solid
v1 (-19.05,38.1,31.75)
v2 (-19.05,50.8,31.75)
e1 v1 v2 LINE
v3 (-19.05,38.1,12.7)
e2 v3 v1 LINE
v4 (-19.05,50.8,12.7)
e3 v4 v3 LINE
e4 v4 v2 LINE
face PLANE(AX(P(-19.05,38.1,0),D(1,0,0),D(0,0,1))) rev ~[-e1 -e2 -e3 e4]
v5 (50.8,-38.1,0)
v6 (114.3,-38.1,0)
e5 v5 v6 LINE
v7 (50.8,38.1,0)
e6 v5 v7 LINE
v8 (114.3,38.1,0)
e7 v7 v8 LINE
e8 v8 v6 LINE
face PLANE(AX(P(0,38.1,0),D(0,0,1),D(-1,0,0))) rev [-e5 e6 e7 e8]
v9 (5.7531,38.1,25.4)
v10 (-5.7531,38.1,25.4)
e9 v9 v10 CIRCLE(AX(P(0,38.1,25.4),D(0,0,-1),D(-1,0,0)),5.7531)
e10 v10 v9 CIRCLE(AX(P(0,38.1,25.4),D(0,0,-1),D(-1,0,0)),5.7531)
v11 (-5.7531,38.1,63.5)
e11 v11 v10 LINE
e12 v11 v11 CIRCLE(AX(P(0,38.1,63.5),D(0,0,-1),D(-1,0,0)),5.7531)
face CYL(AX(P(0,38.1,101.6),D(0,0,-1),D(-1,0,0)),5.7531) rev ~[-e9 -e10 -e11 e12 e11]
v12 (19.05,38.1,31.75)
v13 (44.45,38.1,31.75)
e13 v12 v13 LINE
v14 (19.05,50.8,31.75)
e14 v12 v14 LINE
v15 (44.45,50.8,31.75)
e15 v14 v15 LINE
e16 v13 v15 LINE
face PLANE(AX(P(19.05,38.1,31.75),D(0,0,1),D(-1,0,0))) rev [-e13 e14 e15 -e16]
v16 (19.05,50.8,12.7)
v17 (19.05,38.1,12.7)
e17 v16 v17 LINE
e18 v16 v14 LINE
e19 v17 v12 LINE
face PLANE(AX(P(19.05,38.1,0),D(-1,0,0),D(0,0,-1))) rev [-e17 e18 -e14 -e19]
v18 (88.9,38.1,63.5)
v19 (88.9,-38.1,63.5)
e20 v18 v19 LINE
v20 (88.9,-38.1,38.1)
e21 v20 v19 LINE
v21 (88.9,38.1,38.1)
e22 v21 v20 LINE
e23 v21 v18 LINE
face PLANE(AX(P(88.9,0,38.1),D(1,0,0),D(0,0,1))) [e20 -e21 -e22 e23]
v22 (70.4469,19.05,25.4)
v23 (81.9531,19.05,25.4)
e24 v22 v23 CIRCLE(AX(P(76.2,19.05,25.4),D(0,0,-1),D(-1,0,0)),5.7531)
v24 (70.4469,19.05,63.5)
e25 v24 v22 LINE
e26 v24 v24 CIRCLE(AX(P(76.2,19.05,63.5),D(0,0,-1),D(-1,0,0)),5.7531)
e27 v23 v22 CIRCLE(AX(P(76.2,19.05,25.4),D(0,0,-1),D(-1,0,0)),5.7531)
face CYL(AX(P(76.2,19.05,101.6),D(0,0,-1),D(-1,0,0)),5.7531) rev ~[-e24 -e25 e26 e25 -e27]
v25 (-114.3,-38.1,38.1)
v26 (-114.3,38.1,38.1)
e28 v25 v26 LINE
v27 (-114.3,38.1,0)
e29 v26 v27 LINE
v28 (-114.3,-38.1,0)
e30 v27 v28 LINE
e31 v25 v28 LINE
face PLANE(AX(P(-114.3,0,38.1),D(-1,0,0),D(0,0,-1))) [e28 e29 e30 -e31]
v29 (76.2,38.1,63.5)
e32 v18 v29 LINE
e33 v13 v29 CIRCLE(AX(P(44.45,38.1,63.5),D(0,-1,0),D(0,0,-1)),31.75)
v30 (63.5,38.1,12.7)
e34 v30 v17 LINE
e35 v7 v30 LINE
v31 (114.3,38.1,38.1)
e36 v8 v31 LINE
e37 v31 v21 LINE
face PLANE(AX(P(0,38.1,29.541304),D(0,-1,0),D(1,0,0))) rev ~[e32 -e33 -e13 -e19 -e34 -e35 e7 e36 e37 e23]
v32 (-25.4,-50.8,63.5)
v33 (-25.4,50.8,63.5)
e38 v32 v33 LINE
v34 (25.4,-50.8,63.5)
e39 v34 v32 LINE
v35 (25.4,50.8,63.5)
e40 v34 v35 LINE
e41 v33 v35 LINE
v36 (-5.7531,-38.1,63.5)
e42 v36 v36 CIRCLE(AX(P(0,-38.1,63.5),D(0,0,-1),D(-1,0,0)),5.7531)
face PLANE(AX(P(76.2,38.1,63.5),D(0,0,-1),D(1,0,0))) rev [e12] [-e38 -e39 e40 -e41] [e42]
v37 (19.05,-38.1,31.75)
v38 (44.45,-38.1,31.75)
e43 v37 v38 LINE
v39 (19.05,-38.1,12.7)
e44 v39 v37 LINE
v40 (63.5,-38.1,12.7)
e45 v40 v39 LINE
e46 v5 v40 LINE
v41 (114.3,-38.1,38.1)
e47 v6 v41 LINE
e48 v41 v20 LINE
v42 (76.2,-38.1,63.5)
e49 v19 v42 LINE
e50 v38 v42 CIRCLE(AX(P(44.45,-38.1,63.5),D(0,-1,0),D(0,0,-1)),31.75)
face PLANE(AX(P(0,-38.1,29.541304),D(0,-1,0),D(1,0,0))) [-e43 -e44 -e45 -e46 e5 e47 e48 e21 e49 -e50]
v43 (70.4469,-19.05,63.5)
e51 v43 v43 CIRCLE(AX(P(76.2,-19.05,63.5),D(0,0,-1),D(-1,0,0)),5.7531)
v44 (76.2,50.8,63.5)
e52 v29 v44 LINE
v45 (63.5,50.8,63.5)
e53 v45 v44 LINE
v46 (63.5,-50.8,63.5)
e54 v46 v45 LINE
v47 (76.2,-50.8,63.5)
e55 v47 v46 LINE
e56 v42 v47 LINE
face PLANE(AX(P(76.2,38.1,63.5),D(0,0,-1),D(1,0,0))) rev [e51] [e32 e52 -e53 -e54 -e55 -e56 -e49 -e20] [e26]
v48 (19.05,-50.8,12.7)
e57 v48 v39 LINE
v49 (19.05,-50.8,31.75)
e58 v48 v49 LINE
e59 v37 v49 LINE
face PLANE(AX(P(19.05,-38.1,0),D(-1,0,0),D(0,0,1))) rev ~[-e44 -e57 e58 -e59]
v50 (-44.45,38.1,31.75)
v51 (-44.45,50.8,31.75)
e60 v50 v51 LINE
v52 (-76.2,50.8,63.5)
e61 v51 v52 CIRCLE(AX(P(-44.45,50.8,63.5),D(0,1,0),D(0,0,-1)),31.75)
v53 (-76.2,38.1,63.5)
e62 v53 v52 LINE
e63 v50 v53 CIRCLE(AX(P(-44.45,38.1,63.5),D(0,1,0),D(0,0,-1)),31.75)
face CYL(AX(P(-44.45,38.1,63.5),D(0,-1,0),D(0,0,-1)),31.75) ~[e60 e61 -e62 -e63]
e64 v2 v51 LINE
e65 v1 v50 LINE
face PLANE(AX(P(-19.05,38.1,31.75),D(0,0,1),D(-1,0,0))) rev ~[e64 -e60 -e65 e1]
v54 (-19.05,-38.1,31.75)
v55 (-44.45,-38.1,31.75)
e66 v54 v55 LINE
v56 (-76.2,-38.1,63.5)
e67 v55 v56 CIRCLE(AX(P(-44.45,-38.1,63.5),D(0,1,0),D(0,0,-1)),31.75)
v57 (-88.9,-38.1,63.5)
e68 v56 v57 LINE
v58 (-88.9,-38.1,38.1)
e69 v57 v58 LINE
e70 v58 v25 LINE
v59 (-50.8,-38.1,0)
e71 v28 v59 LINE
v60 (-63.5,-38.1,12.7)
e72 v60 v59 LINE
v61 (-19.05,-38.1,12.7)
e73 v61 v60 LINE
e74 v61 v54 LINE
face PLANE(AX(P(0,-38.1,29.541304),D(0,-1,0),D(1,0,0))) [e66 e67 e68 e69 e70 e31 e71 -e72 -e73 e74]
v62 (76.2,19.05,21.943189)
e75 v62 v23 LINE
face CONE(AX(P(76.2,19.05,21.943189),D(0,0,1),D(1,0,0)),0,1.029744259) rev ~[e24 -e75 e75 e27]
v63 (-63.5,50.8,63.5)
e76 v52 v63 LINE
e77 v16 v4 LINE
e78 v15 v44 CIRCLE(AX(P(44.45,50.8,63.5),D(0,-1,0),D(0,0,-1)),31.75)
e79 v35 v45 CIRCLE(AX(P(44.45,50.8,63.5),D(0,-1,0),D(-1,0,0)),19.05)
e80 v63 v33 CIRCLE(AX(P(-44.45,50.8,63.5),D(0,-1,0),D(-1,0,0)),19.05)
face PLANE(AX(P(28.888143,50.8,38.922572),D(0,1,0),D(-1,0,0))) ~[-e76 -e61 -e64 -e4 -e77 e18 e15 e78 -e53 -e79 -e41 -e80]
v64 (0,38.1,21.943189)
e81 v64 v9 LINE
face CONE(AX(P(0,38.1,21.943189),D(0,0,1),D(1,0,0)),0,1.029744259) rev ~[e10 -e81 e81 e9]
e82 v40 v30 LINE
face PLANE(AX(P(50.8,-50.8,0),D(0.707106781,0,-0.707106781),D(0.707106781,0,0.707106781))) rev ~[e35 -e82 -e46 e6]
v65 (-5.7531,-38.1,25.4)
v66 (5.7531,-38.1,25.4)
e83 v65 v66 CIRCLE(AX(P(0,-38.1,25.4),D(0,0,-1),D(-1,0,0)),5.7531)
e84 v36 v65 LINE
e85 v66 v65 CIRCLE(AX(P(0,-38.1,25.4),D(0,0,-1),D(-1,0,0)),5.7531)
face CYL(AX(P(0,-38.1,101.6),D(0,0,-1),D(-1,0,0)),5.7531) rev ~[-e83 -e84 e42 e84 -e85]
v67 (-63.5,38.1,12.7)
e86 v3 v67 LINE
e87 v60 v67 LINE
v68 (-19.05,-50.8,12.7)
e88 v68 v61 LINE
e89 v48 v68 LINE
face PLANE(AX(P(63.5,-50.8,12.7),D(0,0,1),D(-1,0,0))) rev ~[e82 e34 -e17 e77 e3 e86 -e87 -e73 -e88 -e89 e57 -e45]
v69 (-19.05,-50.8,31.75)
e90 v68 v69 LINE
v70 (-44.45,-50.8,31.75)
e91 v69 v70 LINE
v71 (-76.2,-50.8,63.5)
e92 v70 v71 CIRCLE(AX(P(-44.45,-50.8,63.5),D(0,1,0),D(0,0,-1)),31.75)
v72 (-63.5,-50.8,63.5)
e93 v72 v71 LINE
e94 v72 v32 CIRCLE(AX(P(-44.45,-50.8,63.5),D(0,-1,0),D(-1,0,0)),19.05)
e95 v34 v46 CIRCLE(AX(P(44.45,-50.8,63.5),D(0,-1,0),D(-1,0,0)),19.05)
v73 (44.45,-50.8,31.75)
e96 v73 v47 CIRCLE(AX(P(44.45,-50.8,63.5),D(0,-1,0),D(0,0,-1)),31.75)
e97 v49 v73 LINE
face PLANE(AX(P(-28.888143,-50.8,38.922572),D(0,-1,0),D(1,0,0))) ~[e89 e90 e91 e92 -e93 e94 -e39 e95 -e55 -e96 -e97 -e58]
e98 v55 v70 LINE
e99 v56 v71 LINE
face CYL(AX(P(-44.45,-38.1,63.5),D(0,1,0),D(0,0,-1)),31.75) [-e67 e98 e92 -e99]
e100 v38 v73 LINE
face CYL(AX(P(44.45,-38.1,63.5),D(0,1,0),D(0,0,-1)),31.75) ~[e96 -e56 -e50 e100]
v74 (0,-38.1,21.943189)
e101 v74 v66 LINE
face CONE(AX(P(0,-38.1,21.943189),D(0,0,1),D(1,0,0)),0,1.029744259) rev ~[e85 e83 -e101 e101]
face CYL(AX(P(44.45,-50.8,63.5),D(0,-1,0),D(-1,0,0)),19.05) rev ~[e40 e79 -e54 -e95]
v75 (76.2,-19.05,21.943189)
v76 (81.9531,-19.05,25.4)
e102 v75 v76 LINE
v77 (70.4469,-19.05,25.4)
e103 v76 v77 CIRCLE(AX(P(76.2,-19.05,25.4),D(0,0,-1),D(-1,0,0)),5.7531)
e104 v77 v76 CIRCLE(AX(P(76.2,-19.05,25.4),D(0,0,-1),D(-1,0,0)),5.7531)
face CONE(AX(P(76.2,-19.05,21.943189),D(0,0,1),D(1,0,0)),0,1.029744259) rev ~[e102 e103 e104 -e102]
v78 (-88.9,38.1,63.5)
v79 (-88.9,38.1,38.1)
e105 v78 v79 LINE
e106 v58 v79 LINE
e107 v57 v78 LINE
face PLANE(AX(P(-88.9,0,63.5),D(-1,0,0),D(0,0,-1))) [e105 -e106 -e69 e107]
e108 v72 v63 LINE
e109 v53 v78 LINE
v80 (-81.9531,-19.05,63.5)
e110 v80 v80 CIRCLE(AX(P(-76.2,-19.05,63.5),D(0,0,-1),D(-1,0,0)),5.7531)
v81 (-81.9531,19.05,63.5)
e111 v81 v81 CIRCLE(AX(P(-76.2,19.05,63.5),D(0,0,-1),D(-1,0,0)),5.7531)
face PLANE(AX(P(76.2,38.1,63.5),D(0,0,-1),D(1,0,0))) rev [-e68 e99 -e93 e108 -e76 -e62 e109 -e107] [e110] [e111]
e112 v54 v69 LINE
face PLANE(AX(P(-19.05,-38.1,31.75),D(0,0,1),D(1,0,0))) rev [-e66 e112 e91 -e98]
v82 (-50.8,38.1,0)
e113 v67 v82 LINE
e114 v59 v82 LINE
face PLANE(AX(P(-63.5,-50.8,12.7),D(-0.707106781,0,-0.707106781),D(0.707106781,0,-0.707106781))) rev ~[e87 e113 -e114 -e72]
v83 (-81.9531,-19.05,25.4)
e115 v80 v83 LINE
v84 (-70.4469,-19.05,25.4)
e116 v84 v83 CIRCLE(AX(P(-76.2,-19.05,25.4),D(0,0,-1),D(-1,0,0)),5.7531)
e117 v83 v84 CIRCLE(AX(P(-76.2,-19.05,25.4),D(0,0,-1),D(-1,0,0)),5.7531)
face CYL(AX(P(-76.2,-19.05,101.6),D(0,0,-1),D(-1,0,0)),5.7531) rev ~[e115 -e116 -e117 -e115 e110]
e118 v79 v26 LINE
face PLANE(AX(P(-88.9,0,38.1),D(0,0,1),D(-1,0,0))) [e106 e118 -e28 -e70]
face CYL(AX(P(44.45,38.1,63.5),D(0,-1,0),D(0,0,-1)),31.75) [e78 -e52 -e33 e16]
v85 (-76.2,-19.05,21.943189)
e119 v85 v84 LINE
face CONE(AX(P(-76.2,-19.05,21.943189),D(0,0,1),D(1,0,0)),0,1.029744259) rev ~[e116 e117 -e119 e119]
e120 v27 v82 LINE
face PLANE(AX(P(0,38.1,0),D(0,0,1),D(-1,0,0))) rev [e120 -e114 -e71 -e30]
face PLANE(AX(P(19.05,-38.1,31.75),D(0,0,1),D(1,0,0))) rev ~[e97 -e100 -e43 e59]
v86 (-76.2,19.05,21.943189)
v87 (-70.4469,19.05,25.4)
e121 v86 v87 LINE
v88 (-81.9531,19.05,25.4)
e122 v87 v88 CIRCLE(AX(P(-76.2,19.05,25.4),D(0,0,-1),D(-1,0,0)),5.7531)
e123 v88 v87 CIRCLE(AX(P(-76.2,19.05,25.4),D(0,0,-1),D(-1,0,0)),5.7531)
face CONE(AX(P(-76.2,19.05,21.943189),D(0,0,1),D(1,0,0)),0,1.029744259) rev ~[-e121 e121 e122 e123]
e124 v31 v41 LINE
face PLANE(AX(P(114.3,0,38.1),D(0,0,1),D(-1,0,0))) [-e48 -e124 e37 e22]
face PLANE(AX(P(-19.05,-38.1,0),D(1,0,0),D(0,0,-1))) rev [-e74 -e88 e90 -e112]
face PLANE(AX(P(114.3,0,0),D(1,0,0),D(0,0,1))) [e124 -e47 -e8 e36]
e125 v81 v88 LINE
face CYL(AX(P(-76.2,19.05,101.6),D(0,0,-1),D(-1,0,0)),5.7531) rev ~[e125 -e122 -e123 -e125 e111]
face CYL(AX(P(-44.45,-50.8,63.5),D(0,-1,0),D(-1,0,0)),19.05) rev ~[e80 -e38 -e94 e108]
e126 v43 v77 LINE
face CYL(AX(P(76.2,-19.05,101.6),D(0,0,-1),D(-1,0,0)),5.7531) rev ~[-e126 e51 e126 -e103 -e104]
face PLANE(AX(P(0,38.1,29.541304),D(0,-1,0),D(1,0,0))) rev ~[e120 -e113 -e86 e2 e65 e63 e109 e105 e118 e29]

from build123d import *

# Parameters (mm, degrees)
F1_DEPTH         = 38.1
F3_DEPTH         = 12.7
F3_COPIES1_COUNT = 2
F5_DEPTH         = 101.601
F7_D             = 11.5062
F7_DEPTH         = 38.1
F7_TIP           = 3.4568112273
F9_DEPTH         = 101.601


# Not quite as in the source:
# - a pattern or mirror of a feature is missing from the dataset's text; its kind, count and spacing are read off the source's solid


with BuildPart() as f1:
    # F0 (on Front) → F1 (new body, symmetric)
    with BuildSketch(Plane.XZ):
        Polygon((-114.3, 38.1), (-114.3, 0), (114.3, 0), (114.3, 38.1), (88.9, 38.1), (88.9, 63.5), (-88.9, 63.5), (-88.9, 38.1), align=None)
    extrude(amount=F1_DEPTH, both=True)

    # F2 (on face) → F3 (join)
    with BuildSketch(Plane.XZ.offset(38.1)):
        with BuildLine():
            Line((19.05, 31.75), (44.45, 31.75))
            ThreePointArc((44.45, 31.75), (66.9006403027, 41.0493596973), (76.2, 63.5))
            Line((76.2, 63.5), (0, 63.5))
            Line((0, 63.5), (0, 0))
            Line((0, 0), (19.05, 0))
            Line((19.05, 0), (19.05, 31.75))
        make_face()
    f3 = extrude(amount=F3_DEPTH)

    # F3_copies: F3 across plane
    add(f3.mirror(Plane(origin=(0, 0, 0), x_dir=(0, 0, -1), z_dir=(-1, 0, 0))))

    # F3_copies1: F3 ×2 about axis
    f3_copies1_axis = Axis((0, 0, 0), (0, 0, 1))
    for i in range(1, F3_COPIES1_COUNT):
        add(f3.rotate(f3_copies1_axis, i * 360 / F3_COPIES1_COUNT))

    # F3_copies2: F3 across plane
    add(f3.mirror(Plane.ZX))

    # F4 (on face) → F5 (cut, through all)
    with BuildSketch(Plane.XZ.offset(50.8)):
        Polygon((-63.5, 12.7), (-50.8, 0), (50.8, 0), (63.5, 12.7), align=None)
    extrude(amount=-F5_DEPTH, mode=Mode.SUBTRACT)

    # F7
    with Locations(Plane.XY.offset(63.5)):
        with Locations((-76.2, 19.05), (-76.2, -19.05), (0, 38.1), (0, -38.1), (76.2, -19.05), (76.2, 19.05)):
            Hole(F7_D / 2, depth=F7_DEPTH)
            with Locations((0, 0, -(F7_DEPTH + F7_TIP / 2))):  # 118° drill point
                Cone(0, F7_D / 2, F7_TIP, mode=Mode.SUBTRACT)

    # F8 (on face) → F9 (cut, through all)
    with BuildSketch(Plane.XZ.offset(50.8)):
        with BuildLine():
            Line((-25.4, 63.5), (-63.5, 63.5))
            ThreePointArc((-63.5, 63.5), (-44.45, 44.45), (-25.4, 63.5))
        make_face()
        with BuildLine():
            Line((63.5, 63.5), (25.4, 63.5))
            ThreePointArc((25.4, 63.5), (44.45, 44.45), (63.5, 63.5))
        make_face()
    extrude(amount=-F9_DEPTH, mode=Mode.SUBTRACT)


solid = f1.part
